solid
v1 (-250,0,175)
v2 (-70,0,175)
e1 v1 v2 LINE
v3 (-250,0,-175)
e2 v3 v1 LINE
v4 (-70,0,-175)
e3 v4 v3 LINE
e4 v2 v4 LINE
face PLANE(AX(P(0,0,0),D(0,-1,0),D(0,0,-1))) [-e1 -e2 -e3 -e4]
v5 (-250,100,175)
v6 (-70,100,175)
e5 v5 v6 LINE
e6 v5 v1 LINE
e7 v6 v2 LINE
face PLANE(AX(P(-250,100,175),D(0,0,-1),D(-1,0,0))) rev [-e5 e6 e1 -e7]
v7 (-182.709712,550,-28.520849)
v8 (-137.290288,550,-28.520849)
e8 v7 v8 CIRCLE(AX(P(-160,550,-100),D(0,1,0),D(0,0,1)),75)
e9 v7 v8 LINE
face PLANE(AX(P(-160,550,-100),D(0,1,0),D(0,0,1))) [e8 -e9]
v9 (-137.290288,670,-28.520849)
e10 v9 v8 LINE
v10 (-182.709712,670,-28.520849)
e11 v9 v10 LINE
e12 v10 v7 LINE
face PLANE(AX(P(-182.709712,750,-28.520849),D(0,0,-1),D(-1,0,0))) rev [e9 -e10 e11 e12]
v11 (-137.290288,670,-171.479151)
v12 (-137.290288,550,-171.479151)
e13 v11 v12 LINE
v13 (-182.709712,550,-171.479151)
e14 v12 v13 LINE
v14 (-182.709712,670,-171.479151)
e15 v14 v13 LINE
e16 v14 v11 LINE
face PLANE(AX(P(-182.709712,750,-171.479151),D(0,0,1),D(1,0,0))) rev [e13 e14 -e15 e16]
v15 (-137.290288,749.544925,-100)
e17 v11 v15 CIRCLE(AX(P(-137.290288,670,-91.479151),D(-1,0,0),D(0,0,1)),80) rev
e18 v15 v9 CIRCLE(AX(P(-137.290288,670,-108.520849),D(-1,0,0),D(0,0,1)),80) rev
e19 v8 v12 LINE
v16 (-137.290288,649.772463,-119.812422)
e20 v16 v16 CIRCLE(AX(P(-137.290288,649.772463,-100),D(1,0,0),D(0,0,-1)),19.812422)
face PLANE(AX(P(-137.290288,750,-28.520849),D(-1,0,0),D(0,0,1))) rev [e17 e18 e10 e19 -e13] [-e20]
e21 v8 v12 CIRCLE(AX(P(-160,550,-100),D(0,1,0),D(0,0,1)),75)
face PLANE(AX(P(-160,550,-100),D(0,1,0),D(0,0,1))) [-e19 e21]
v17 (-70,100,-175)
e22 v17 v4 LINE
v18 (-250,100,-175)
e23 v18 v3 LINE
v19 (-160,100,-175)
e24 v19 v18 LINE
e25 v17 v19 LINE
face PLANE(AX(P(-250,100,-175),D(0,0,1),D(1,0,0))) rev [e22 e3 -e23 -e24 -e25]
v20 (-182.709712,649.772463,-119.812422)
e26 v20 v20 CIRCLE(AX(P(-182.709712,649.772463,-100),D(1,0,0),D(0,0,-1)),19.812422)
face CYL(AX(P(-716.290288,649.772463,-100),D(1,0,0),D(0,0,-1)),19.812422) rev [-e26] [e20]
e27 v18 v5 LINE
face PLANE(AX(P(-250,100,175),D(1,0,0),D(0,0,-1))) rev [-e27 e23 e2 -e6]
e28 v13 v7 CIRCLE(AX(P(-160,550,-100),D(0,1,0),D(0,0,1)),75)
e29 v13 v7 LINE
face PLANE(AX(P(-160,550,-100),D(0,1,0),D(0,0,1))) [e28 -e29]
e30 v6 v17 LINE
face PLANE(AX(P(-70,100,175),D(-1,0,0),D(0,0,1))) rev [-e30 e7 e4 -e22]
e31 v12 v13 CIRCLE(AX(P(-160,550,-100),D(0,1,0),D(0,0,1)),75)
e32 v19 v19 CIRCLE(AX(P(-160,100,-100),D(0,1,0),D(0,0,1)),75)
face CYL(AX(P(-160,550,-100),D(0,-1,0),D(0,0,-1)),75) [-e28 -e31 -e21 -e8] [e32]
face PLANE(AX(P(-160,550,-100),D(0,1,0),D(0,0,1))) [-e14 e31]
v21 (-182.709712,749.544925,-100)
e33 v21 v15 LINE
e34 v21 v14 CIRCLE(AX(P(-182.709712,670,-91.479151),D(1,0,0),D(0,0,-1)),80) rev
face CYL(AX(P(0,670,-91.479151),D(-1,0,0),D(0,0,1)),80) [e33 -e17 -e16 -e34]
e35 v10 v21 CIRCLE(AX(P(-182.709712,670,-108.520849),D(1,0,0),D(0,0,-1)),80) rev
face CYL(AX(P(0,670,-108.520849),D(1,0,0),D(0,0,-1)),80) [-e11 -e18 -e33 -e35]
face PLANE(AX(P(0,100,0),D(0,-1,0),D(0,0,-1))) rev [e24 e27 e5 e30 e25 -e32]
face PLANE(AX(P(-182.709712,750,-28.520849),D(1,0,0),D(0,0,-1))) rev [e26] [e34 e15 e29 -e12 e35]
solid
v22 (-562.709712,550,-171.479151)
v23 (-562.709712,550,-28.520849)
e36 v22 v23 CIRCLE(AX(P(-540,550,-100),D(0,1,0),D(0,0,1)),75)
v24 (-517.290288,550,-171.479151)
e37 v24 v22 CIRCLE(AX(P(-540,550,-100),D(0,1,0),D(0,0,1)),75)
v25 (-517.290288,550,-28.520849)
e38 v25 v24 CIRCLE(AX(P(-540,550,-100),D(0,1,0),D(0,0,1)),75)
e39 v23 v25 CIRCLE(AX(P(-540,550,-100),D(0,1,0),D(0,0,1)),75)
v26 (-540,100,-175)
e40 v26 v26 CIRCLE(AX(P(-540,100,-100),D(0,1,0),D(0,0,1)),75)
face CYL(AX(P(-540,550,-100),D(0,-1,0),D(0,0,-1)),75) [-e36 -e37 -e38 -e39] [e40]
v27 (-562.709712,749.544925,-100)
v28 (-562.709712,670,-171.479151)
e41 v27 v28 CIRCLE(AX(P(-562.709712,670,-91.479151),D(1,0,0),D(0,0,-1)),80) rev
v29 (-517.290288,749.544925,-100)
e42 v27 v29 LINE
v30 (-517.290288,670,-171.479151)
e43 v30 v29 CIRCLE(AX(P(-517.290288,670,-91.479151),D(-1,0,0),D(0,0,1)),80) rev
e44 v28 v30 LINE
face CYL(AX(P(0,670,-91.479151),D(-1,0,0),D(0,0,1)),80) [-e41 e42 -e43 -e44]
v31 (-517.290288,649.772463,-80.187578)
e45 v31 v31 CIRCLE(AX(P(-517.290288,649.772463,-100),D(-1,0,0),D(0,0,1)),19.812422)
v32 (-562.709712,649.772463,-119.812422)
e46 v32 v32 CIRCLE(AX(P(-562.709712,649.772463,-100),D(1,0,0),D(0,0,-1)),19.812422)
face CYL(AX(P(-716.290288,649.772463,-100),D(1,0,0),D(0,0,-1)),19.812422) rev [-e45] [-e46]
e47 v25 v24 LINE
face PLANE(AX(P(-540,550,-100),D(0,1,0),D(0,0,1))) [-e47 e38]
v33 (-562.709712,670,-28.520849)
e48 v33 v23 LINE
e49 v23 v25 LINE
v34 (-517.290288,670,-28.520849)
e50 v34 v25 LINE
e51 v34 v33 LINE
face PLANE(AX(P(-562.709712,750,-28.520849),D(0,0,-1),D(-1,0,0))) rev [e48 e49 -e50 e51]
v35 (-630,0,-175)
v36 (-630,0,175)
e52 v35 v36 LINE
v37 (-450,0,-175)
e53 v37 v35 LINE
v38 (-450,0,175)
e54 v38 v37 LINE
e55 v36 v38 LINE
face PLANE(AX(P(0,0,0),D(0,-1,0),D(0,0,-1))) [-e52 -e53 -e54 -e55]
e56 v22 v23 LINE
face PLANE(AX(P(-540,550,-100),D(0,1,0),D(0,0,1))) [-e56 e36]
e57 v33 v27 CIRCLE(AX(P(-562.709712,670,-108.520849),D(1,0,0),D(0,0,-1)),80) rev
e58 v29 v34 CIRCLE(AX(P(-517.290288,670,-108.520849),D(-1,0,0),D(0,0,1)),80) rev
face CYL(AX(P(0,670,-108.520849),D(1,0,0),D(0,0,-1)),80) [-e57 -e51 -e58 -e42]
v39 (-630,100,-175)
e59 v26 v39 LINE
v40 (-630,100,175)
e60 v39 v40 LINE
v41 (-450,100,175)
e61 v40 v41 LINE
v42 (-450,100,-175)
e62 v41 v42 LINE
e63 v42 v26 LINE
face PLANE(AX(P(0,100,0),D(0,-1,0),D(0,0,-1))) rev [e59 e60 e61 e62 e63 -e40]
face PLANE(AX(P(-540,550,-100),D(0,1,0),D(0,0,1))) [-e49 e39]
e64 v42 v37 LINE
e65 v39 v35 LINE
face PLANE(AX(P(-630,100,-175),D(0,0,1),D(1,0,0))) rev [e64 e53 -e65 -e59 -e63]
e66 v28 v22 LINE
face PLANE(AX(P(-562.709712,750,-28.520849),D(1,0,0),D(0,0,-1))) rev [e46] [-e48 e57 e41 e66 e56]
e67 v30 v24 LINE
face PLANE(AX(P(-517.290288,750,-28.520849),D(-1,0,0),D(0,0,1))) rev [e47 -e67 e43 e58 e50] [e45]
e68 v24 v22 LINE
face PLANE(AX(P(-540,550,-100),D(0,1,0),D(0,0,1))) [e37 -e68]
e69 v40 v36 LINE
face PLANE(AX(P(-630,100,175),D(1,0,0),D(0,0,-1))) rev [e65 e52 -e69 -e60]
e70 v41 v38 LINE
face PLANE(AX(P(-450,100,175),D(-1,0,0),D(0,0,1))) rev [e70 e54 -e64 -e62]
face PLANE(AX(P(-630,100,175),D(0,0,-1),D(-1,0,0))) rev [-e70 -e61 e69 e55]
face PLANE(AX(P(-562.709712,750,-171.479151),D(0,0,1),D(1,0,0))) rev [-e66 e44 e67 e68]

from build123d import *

# Parameters (mm, degrees)
SKETCH1_W             = 180
SKETCH1_H             = 350
BOSS_EXTRUDE1_DEPTH   = 100
BOSS_EXTRUDE1_2_DEPTH = 100
SKETCH2_R             = 75
BOSS_EXTRUDE2_DEPTH   = 450
SKETCH3_W             = 45.419423784
SKETCH3_H             = 142.958301414
BOSS_EXTRUDE3_DEPTH   = 200
FILLET1_R             = 80
FILLET2_R             = 80
SKETCH4_R             = 19.812422485
CUT_EXTRUDE1_DEPTH    = 579


with BuildPart() as part:
    # Sketch1 → Boss-Extrude1 (new body)
    with BuildSketch(Plane(origin=(0, 0, 0), x_dir=(1, 0, 0), z_dir=(0, 1, 0))):
        with Locations((-540, 0)):
            Rectangle(SKETCH1_W, SKETCH1_H)
    extrude(amount=BOSS_EXTRUDE1_DEPTH)



with BuildPart() as body_2:
    # Sketch1 → Boss-Extrude1 2 (new body)
    with BuildSketch(Plane(origin=(0, 0, 0), x_dir=(1, 0, 0), z_dir=(0, 1, 0))):
        with Locations((-160, 0)):
            Rectangle(SKETCH1_W, SKETCH1_H)
    extrude(amount=BOSS_EXTRUDE1_2_DEPTH)


with BuildPart() as part_1:
    add(part.part)

    add(body_2.part)  # Boss-Extrude2 merges body 2
    # Sketch2 → Boss-Extrude2 (add)
    with BuildSketch(Plane(origin=(0, 100, 0), x_dir=(1, 0, 0), z_dir=(0, 1, 0))):
        with Locations(Location((-540, 100, 0), (0, 0, 90))):
            Circle(SKETCH2_R)
        with Locations(Location((-160, 100, 0), (0, 0, 90))):
            Circle(SKETCH2_R)
    extrude(amount=BOSS_EXTRUDE2_DEPTH)

    # Sketch3 → Boss-Extrude3 (add)
    with BuildSketch(Plane(origin=(0, 550, 0), x_dir=(1, 0, 0), z_dir=(0, 1, 0))):
        with Locations((-540, 100)):
            Rectangle(SKETCH3_W, SKETCH3_H)
        with Locations((-160, 100)):
            Rectangle(SKETCH3_W, SKETCH3_H)
    extrude(amount=BOSS_EXTRUDE3_DEPTH)

    # Fillet1
    # the kernel refuses this fillet: 80 mm, written as the material it takes off along each edge
    with BuildSketch(Plane(origin=(-317.290288108, 750, -171.479150707), x_dir=(0, -1, 0), z_dir=(-1, 0, 0)), Plane(origin=(-762.709711892, 750, -28.520849293), x_dir=(0, -1, 0), z_dir=(1, 0, 0))) as fillet1_piece_1:
        with BuildLine():
            CenterArc((FILLET1_R, FILLET1_R), FILLET1_R, 180, 90)
            Line((0, FILLET1_R), (0, 0))
            Line((0, 0), (FILLET1_R, 0))
        make_face()
    extrude(amount=445.419423783, mode=Mode.SUBTRACT)

    # Fillet2
    # the kernel refuses this fillet: 80 mm, written as the material it takes off along each edge
    with BuildSketch(Plane(origin=(62.709711892, 750, -171.479150707), x_dir=(0, -1, 0), z_dir=(-1, 0, 0)), Plane(origin=(-382.709711892, 750, -28.520849293), x_dir=(0, -1, 0), z_dir=(1, 0, 0))) as fillet2_piece_1:
        with BuildLine():
            CenterArc((FILLET2_R, FILLET2_R), FILLET2_R, 180, 90)
            Line((0, FILLET2_R), (0, 0))
            Line((0, 0), (FILLET2_R, 0))
        make_face()
    extrude(amount=445.419423783, mode=Mode.SUBTRACT)

    # Sketch4 → Cut-Extrude1 (cut)
    with BuildSketch(Plane(origin=(-137.290288108, 0, 0), x_dir=(0, 0, -1), z_dir=(1, 0, 0))):
        with Locations((100, 649.772462607)):
            Circle(SKETCH4_R)
    extrude(amount=-CUT_EXTRUDE1_DEPTH, mode=Mode.SUBTRACT)


solid = part_1.part
